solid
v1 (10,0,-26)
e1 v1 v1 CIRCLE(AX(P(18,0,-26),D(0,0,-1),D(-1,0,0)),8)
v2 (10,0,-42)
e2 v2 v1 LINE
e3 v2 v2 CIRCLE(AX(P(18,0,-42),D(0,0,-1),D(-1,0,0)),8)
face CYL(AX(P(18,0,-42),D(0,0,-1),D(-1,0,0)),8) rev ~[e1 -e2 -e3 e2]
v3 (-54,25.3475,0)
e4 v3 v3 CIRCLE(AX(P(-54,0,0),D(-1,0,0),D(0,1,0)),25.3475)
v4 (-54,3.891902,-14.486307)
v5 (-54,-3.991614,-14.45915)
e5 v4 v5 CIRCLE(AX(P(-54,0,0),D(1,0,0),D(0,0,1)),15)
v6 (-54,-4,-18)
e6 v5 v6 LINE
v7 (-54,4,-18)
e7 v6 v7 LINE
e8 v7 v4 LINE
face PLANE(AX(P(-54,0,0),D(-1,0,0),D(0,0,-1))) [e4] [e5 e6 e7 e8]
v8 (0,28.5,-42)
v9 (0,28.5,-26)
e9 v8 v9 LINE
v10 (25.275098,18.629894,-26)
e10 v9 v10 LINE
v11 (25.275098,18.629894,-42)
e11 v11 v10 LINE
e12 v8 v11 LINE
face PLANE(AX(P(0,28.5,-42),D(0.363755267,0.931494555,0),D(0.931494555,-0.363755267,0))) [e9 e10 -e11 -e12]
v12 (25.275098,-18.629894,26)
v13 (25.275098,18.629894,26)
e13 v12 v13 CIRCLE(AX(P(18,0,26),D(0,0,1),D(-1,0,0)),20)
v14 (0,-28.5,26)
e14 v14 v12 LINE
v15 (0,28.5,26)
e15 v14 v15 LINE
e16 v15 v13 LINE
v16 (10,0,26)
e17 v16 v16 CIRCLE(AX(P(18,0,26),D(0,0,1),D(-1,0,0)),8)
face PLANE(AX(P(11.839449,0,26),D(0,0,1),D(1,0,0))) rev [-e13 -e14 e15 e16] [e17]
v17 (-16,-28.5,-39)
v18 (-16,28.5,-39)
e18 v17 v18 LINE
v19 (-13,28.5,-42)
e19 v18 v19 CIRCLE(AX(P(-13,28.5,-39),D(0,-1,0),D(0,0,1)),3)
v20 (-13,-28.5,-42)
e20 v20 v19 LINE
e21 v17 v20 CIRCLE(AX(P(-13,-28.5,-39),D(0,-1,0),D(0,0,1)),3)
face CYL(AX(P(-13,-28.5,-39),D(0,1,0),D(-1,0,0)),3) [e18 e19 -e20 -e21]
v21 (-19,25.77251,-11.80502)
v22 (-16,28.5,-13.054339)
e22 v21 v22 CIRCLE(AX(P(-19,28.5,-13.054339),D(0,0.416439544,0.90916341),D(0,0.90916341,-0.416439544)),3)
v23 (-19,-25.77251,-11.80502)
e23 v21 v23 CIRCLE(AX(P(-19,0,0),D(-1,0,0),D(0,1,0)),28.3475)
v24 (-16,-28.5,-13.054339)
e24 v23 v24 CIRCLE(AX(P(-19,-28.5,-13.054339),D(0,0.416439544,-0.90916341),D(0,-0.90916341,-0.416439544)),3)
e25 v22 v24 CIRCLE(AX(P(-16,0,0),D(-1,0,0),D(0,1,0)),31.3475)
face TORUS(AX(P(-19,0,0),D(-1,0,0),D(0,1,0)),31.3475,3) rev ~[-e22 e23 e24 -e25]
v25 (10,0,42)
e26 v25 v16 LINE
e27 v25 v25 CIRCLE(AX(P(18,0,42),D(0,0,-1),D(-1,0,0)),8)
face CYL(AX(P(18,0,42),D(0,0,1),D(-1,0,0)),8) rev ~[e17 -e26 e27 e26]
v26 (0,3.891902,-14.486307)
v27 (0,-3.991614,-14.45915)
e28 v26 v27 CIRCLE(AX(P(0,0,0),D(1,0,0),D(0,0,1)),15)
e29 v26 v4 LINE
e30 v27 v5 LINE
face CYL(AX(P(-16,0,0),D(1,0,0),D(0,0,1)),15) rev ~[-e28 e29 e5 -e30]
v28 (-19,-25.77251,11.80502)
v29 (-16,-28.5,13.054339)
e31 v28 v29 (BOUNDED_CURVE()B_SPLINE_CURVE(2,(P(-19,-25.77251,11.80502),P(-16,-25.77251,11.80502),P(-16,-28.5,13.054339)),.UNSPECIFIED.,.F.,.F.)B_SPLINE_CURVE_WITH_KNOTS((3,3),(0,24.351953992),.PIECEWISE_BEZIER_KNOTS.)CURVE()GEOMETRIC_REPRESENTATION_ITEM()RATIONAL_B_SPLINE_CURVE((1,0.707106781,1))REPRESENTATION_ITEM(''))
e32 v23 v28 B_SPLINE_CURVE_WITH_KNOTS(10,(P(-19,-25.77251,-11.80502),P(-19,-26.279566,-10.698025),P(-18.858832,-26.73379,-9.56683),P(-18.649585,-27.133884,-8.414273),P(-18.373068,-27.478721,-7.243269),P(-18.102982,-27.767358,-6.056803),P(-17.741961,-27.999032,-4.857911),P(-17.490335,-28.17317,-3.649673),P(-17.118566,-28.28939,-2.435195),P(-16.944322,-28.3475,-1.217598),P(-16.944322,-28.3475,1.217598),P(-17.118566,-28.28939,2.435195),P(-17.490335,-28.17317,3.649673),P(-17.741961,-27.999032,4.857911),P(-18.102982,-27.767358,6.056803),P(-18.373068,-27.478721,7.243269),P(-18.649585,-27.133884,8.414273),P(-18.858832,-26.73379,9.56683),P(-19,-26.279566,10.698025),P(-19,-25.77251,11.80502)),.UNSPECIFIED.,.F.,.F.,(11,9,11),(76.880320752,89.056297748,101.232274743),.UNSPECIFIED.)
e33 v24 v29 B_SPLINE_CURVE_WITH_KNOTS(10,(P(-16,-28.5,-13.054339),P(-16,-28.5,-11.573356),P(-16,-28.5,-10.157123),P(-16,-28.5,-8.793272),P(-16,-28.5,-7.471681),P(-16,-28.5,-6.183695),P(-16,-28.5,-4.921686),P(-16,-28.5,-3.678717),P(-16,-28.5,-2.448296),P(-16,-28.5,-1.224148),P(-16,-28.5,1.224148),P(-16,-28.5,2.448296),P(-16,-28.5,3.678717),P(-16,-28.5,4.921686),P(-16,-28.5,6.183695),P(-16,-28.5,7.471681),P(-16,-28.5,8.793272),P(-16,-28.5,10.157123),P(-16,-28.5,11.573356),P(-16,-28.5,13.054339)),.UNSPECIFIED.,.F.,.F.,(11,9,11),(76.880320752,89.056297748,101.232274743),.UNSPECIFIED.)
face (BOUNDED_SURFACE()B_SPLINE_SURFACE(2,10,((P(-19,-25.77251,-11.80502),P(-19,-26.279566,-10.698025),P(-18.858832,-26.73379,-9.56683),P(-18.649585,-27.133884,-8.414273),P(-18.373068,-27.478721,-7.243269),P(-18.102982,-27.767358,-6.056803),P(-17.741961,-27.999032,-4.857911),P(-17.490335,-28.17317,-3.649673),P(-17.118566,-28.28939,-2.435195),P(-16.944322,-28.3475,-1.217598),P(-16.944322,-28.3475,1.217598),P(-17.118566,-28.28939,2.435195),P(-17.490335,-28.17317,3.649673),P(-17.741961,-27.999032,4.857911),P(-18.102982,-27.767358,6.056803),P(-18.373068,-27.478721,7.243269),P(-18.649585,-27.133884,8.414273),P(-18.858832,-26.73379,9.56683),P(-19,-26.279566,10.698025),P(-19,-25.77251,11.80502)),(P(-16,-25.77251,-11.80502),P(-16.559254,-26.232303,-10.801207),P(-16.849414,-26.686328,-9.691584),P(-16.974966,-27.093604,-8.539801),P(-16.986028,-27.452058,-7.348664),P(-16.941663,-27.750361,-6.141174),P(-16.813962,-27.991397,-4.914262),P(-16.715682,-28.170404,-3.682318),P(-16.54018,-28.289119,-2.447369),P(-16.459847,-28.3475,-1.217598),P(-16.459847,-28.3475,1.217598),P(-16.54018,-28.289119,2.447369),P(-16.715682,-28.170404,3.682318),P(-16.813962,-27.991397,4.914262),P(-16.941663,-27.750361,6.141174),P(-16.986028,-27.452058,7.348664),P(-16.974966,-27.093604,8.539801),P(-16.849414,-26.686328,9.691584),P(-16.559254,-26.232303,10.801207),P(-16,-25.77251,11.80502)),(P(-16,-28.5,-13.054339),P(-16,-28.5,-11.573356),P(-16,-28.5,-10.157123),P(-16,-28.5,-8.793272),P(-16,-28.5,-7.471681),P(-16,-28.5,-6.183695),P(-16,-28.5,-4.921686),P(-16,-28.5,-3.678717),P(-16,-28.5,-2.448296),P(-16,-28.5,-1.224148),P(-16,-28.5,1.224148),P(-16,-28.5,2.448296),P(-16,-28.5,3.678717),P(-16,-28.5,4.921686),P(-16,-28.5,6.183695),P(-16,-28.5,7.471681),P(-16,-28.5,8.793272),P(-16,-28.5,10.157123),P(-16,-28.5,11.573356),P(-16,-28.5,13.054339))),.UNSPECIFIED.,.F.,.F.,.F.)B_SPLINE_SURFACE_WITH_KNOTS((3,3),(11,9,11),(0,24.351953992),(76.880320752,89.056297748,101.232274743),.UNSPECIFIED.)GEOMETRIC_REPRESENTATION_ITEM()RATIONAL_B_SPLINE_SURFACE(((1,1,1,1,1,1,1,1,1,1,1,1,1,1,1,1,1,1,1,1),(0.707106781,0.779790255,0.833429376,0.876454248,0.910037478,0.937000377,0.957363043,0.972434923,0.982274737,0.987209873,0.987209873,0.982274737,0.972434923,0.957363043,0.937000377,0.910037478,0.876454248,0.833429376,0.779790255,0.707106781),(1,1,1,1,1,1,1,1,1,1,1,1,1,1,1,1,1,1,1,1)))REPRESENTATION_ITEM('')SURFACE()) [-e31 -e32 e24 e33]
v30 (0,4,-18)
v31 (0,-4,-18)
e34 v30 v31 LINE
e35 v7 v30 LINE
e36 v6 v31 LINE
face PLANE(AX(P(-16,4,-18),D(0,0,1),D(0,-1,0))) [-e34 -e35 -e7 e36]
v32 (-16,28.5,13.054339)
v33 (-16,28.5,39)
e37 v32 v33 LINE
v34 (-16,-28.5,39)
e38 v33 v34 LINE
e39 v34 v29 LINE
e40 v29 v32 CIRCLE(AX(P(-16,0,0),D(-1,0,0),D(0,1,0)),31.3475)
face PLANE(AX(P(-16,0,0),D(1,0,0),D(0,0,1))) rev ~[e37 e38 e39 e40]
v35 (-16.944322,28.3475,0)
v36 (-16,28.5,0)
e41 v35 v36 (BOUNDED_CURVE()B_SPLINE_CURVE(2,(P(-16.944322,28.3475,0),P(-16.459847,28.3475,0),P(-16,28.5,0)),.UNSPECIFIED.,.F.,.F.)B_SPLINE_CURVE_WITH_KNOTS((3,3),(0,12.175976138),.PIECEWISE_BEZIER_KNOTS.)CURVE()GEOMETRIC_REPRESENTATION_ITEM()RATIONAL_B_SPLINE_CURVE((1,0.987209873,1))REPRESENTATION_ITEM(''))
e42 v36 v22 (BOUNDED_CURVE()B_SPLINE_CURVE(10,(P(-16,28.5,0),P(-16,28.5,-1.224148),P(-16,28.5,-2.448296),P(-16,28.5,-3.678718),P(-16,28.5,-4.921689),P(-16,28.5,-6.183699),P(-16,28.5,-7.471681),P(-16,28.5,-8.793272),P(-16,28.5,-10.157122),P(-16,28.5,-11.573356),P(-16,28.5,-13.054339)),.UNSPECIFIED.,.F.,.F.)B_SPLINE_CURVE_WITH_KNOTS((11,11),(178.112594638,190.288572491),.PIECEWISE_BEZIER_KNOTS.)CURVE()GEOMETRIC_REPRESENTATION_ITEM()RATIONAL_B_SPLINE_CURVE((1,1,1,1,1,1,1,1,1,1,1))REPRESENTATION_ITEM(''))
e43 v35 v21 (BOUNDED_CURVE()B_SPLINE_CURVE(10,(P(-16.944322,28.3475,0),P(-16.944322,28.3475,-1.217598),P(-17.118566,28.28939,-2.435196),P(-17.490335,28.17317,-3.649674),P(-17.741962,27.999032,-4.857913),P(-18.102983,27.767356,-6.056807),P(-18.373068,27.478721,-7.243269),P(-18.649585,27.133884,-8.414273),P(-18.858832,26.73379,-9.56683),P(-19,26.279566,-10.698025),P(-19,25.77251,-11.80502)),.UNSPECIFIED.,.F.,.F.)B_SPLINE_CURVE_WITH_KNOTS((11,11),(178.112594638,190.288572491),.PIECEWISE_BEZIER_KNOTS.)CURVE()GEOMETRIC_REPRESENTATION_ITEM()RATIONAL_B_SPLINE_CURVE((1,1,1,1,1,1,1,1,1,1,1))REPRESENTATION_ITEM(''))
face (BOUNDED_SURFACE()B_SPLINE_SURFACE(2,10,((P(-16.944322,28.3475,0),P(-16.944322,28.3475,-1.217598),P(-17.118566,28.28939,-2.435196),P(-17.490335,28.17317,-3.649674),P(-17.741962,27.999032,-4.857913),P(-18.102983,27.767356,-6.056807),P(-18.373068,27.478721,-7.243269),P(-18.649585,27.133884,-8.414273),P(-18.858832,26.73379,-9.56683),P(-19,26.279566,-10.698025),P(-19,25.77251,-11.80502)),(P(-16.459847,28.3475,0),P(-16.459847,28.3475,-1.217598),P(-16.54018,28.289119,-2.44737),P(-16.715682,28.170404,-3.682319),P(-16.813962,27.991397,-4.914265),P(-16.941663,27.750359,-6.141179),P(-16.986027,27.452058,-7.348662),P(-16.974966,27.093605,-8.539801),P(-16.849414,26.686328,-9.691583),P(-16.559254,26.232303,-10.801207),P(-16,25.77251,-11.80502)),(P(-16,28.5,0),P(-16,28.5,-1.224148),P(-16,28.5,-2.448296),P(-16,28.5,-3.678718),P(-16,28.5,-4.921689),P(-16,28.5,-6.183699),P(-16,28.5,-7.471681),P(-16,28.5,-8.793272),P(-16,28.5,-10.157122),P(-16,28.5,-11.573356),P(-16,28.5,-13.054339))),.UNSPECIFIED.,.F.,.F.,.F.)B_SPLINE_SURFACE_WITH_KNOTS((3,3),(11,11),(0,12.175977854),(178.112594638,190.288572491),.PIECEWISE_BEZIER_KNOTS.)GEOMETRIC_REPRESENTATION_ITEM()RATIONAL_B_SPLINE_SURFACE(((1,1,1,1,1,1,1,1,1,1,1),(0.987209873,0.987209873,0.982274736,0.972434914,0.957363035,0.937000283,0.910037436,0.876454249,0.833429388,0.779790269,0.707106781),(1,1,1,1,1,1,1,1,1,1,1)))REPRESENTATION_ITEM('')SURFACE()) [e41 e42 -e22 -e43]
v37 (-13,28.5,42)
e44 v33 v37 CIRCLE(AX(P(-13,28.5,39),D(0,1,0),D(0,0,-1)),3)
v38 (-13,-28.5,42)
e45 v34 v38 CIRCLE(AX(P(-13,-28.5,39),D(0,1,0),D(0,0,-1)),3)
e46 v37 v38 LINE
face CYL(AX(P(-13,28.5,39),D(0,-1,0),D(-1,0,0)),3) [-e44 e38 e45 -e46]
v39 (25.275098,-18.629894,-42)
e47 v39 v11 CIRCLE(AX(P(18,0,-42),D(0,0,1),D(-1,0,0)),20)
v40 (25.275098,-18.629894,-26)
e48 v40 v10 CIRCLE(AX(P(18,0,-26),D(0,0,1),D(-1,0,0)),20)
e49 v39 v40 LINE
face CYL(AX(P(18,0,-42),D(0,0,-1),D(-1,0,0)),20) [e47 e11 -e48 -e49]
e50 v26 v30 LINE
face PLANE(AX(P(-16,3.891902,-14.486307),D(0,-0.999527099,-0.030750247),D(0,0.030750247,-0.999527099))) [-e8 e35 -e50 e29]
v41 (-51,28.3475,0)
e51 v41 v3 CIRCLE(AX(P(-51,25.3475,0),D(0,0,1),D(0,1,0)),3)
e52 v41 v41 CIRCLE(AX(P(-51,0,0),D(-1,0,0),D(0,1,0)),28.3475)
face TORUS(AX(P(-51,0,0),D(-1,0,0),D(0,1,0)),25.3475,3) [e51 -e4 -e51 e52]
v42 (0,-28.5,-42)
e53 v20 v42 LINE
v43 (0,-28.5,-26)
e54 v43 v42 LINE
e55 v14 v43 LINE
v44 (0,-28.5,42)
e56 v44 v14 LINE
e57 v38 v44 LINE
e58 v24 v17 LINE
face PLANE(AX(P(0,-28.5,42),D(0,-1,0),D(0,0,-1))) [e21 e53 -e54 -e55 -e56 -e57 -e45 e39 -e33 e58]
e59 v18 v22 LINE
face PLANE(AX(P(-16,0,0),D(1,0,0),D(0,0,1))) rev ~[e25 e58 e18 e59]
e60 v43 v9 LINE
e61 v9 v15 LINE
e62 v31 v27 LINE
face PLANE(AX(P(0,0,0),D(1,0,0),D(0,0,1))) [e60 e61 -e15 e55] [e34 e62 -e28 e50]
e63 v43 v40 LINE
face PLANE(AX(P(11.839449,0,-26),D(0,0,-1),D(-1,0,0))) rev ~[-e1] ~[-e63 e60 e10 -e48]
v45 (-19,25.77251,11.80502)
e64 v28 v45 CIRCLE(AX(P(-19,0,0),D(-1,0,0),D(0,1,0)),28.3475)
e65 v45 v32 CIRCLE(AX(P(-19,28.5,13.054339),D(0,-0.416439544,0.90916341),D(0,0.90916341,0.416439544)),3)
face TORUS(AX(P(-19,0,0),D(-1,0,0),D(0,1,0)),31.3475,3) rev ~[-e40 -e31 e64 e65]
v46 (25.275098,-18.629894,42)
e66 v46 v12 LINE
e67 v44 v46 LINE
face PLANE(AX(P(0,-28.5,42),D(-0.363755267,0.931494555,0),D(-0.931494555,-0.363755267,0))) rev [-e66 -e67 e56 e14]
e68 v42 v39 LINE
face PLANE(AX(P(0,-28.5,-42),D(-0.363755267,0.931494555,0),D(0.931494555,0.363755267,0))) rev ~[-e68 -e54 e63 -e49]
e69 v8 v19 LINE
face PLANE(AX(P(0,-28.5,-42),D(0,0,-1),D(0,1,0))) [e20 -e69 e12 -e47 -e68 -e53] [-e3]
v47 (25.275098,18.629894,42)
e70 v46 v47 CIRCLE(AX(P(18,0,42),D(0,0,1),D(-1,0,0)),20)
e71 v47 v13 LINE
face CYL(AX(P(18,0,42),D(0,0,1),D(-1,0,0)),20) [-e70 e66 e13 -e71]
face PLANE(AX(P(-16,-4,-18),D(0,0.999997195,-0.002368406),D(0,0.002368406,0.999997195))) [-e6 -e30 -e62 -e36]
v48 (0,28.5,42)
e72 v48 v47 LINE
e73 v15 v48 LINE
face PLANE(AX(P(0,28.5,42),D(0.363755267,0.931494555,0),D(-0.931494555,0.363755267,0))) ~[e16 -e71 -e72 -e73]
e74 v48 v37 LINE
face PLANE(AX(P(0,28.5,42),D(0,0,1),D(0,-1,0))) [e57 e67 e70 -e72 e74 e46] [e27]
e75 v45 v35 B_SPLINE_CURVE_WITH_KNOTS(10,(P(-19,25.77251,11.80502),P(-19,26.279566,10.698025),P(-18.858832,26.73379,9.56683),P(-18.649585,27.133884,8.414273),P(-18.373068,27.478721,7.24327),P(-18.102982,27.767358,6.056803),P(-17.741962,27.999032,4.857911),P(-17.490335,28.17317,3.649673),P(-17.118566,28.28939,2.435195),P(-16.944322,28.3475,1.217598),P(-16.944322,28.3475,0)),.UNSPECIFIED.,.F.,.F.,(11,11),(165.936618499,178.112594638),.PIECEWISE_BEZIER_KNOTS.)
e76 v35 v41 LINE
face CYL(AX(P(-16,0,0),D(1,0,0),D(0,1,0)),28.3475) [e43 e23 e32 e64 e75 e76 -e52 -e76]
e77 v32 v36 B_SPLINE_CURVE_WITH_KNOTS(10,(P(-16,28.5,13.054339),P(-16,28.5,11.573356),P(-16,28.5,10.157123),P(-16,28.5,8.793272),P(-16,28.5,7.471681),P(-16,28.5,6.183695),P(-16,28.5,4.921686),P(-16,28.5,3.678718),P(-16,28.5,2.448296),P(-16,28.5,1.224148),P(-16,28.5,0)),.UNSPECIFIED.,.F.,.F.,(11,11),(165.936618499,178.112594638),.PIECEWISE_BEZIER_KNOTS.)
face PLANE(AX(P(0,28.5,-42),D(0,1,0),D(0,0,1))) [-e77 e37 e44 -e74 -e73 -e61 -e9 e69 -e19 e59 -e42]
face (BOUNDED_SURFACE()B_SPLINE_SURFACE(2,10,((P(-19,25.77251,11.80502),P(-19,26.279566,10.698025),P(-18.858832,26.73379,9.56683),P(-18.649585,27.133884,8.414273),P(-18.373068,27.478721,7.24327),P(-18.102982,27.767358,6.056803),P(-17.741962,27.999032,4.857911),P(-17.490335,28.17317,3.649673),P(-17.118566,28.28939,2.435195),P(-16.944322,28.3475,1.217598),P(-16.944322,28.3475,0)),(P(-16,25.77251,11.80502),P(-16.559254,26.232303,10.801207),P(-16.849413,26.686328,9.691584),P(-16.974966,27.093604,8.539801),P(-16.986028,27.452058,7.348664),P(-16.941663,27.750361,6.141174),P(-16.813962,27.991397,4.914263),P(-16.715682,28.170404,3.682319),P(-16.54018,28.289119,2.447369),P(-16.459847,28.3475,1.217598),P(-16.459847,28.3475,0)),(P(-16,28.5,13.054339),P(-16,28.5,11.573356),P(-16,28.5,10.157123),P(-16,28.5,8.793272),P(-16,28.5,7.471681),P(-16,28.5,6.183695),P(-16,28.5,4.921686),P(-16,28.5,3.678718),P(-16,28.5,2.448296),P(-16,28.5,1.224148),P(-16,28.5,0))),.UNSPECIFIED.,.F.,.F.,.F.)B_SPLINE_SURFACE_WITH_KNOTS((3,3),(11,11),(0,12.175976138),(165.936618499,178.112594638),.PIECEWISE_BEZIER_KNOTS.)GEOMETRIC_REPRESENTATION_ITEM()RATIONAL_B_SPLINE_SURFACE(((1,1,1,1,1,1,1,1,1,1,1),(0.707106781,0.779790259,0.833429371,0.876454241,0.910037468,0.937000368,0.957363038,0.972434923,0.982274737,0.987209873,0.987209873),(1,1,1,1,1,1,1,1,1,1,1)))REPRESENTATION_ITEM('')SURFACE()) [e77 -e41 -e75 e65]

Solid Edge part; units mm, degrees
sketch "Sketch1" plane through (0, 0, 0) normal (1, 0, 0) x (0, 1, 0)
  line L0 (28.5, 42) -> (-28.5, 42)
  line L1 (-28.5, 42) -> (-28.5, -42)
  line L2 (-28.5, -42) -> (28.5, -42)
  line L3 (28.5, -42) -> (28.5, 42)
extrude "ExtrudedProtrusion_1" add sketch "Sketch1" against normal blind 16
sketch "Sketch2" plane through (-8, 0, -42) normal (0, 0, -1) x (-1, 0, 0)
  line L0 (-8, 28.5) -> (-33.2751, 18.6299)
  line L1 (-8, 28.5) -> (-3.9571, 28.5)
  line L2 (-3.9571, 28.5) -> (-3.9571, -28.5)
  line L3 (-3.9571, -28.5) -> (-8, -28.5)
  line L4 (-8, -28.5) -> (-33.2751, -18.6299)
  arc A0 (-33.2751, -18.6299) -> (-33.2751, 18.6299) centre (-26, 0) cw
extrude "ExtrudedProtrusion_2" add sketch "Sketch2" against normal blind 16
sketch "Sketch3" plane through (-8, 0, -42) normal (0, 0, -1) x (-1, 0, 0)
  circle A0 centre (-26, 0) radius 8
extrude "ExtrudedCutout_4" cut sketch "Sketch3" against normal blind 84.082
mirror "Mirror1" about plane through (0, 0, 0) normal (0, 0, 1) of "ExtrudedProtrusion_2"
mirror "Mirror2" about plane through (0, 0, 0) normal (0, 0, 1) of "ExtrudedCutout_4"
sketch "Sketch4" plane through (-16, 0, 0) normal (-1, 0, 0) x (0, 1, 0)
  circle A0 centre (0, 0) radius 28.3475
extrude "ExtrudedProtrusion_5" add sketch "Sketch4" along normal blind 38
extrude "Cutout1" [suppressed]
fillet "Round_3" radius 3 4 edges at (-54, -28.3475, 0) (-16, -28.3475, 0) (-16, 0, 42) (-16, 0, -42)
sketch "Sketch5" plane through (-16, 0, -26.0271) normal (-1, 0, 0) x (0, 0, 1)
  line L0 (8.0271, -4) -> (11.568, -3.9916)
  line L1 (8.0271, 4) -> (8.0271, -4)
  line L2 (11.5408, 3.8919) -> (8.0271, 4)
  arc A0 (11.5408, 3.8919) -> (11.568, -3.9916) centre (26.0271, 0) cw
extrude "ExtrudedCutout_6" cut sketch "Sketch5" along normal mid plane 204.9146
